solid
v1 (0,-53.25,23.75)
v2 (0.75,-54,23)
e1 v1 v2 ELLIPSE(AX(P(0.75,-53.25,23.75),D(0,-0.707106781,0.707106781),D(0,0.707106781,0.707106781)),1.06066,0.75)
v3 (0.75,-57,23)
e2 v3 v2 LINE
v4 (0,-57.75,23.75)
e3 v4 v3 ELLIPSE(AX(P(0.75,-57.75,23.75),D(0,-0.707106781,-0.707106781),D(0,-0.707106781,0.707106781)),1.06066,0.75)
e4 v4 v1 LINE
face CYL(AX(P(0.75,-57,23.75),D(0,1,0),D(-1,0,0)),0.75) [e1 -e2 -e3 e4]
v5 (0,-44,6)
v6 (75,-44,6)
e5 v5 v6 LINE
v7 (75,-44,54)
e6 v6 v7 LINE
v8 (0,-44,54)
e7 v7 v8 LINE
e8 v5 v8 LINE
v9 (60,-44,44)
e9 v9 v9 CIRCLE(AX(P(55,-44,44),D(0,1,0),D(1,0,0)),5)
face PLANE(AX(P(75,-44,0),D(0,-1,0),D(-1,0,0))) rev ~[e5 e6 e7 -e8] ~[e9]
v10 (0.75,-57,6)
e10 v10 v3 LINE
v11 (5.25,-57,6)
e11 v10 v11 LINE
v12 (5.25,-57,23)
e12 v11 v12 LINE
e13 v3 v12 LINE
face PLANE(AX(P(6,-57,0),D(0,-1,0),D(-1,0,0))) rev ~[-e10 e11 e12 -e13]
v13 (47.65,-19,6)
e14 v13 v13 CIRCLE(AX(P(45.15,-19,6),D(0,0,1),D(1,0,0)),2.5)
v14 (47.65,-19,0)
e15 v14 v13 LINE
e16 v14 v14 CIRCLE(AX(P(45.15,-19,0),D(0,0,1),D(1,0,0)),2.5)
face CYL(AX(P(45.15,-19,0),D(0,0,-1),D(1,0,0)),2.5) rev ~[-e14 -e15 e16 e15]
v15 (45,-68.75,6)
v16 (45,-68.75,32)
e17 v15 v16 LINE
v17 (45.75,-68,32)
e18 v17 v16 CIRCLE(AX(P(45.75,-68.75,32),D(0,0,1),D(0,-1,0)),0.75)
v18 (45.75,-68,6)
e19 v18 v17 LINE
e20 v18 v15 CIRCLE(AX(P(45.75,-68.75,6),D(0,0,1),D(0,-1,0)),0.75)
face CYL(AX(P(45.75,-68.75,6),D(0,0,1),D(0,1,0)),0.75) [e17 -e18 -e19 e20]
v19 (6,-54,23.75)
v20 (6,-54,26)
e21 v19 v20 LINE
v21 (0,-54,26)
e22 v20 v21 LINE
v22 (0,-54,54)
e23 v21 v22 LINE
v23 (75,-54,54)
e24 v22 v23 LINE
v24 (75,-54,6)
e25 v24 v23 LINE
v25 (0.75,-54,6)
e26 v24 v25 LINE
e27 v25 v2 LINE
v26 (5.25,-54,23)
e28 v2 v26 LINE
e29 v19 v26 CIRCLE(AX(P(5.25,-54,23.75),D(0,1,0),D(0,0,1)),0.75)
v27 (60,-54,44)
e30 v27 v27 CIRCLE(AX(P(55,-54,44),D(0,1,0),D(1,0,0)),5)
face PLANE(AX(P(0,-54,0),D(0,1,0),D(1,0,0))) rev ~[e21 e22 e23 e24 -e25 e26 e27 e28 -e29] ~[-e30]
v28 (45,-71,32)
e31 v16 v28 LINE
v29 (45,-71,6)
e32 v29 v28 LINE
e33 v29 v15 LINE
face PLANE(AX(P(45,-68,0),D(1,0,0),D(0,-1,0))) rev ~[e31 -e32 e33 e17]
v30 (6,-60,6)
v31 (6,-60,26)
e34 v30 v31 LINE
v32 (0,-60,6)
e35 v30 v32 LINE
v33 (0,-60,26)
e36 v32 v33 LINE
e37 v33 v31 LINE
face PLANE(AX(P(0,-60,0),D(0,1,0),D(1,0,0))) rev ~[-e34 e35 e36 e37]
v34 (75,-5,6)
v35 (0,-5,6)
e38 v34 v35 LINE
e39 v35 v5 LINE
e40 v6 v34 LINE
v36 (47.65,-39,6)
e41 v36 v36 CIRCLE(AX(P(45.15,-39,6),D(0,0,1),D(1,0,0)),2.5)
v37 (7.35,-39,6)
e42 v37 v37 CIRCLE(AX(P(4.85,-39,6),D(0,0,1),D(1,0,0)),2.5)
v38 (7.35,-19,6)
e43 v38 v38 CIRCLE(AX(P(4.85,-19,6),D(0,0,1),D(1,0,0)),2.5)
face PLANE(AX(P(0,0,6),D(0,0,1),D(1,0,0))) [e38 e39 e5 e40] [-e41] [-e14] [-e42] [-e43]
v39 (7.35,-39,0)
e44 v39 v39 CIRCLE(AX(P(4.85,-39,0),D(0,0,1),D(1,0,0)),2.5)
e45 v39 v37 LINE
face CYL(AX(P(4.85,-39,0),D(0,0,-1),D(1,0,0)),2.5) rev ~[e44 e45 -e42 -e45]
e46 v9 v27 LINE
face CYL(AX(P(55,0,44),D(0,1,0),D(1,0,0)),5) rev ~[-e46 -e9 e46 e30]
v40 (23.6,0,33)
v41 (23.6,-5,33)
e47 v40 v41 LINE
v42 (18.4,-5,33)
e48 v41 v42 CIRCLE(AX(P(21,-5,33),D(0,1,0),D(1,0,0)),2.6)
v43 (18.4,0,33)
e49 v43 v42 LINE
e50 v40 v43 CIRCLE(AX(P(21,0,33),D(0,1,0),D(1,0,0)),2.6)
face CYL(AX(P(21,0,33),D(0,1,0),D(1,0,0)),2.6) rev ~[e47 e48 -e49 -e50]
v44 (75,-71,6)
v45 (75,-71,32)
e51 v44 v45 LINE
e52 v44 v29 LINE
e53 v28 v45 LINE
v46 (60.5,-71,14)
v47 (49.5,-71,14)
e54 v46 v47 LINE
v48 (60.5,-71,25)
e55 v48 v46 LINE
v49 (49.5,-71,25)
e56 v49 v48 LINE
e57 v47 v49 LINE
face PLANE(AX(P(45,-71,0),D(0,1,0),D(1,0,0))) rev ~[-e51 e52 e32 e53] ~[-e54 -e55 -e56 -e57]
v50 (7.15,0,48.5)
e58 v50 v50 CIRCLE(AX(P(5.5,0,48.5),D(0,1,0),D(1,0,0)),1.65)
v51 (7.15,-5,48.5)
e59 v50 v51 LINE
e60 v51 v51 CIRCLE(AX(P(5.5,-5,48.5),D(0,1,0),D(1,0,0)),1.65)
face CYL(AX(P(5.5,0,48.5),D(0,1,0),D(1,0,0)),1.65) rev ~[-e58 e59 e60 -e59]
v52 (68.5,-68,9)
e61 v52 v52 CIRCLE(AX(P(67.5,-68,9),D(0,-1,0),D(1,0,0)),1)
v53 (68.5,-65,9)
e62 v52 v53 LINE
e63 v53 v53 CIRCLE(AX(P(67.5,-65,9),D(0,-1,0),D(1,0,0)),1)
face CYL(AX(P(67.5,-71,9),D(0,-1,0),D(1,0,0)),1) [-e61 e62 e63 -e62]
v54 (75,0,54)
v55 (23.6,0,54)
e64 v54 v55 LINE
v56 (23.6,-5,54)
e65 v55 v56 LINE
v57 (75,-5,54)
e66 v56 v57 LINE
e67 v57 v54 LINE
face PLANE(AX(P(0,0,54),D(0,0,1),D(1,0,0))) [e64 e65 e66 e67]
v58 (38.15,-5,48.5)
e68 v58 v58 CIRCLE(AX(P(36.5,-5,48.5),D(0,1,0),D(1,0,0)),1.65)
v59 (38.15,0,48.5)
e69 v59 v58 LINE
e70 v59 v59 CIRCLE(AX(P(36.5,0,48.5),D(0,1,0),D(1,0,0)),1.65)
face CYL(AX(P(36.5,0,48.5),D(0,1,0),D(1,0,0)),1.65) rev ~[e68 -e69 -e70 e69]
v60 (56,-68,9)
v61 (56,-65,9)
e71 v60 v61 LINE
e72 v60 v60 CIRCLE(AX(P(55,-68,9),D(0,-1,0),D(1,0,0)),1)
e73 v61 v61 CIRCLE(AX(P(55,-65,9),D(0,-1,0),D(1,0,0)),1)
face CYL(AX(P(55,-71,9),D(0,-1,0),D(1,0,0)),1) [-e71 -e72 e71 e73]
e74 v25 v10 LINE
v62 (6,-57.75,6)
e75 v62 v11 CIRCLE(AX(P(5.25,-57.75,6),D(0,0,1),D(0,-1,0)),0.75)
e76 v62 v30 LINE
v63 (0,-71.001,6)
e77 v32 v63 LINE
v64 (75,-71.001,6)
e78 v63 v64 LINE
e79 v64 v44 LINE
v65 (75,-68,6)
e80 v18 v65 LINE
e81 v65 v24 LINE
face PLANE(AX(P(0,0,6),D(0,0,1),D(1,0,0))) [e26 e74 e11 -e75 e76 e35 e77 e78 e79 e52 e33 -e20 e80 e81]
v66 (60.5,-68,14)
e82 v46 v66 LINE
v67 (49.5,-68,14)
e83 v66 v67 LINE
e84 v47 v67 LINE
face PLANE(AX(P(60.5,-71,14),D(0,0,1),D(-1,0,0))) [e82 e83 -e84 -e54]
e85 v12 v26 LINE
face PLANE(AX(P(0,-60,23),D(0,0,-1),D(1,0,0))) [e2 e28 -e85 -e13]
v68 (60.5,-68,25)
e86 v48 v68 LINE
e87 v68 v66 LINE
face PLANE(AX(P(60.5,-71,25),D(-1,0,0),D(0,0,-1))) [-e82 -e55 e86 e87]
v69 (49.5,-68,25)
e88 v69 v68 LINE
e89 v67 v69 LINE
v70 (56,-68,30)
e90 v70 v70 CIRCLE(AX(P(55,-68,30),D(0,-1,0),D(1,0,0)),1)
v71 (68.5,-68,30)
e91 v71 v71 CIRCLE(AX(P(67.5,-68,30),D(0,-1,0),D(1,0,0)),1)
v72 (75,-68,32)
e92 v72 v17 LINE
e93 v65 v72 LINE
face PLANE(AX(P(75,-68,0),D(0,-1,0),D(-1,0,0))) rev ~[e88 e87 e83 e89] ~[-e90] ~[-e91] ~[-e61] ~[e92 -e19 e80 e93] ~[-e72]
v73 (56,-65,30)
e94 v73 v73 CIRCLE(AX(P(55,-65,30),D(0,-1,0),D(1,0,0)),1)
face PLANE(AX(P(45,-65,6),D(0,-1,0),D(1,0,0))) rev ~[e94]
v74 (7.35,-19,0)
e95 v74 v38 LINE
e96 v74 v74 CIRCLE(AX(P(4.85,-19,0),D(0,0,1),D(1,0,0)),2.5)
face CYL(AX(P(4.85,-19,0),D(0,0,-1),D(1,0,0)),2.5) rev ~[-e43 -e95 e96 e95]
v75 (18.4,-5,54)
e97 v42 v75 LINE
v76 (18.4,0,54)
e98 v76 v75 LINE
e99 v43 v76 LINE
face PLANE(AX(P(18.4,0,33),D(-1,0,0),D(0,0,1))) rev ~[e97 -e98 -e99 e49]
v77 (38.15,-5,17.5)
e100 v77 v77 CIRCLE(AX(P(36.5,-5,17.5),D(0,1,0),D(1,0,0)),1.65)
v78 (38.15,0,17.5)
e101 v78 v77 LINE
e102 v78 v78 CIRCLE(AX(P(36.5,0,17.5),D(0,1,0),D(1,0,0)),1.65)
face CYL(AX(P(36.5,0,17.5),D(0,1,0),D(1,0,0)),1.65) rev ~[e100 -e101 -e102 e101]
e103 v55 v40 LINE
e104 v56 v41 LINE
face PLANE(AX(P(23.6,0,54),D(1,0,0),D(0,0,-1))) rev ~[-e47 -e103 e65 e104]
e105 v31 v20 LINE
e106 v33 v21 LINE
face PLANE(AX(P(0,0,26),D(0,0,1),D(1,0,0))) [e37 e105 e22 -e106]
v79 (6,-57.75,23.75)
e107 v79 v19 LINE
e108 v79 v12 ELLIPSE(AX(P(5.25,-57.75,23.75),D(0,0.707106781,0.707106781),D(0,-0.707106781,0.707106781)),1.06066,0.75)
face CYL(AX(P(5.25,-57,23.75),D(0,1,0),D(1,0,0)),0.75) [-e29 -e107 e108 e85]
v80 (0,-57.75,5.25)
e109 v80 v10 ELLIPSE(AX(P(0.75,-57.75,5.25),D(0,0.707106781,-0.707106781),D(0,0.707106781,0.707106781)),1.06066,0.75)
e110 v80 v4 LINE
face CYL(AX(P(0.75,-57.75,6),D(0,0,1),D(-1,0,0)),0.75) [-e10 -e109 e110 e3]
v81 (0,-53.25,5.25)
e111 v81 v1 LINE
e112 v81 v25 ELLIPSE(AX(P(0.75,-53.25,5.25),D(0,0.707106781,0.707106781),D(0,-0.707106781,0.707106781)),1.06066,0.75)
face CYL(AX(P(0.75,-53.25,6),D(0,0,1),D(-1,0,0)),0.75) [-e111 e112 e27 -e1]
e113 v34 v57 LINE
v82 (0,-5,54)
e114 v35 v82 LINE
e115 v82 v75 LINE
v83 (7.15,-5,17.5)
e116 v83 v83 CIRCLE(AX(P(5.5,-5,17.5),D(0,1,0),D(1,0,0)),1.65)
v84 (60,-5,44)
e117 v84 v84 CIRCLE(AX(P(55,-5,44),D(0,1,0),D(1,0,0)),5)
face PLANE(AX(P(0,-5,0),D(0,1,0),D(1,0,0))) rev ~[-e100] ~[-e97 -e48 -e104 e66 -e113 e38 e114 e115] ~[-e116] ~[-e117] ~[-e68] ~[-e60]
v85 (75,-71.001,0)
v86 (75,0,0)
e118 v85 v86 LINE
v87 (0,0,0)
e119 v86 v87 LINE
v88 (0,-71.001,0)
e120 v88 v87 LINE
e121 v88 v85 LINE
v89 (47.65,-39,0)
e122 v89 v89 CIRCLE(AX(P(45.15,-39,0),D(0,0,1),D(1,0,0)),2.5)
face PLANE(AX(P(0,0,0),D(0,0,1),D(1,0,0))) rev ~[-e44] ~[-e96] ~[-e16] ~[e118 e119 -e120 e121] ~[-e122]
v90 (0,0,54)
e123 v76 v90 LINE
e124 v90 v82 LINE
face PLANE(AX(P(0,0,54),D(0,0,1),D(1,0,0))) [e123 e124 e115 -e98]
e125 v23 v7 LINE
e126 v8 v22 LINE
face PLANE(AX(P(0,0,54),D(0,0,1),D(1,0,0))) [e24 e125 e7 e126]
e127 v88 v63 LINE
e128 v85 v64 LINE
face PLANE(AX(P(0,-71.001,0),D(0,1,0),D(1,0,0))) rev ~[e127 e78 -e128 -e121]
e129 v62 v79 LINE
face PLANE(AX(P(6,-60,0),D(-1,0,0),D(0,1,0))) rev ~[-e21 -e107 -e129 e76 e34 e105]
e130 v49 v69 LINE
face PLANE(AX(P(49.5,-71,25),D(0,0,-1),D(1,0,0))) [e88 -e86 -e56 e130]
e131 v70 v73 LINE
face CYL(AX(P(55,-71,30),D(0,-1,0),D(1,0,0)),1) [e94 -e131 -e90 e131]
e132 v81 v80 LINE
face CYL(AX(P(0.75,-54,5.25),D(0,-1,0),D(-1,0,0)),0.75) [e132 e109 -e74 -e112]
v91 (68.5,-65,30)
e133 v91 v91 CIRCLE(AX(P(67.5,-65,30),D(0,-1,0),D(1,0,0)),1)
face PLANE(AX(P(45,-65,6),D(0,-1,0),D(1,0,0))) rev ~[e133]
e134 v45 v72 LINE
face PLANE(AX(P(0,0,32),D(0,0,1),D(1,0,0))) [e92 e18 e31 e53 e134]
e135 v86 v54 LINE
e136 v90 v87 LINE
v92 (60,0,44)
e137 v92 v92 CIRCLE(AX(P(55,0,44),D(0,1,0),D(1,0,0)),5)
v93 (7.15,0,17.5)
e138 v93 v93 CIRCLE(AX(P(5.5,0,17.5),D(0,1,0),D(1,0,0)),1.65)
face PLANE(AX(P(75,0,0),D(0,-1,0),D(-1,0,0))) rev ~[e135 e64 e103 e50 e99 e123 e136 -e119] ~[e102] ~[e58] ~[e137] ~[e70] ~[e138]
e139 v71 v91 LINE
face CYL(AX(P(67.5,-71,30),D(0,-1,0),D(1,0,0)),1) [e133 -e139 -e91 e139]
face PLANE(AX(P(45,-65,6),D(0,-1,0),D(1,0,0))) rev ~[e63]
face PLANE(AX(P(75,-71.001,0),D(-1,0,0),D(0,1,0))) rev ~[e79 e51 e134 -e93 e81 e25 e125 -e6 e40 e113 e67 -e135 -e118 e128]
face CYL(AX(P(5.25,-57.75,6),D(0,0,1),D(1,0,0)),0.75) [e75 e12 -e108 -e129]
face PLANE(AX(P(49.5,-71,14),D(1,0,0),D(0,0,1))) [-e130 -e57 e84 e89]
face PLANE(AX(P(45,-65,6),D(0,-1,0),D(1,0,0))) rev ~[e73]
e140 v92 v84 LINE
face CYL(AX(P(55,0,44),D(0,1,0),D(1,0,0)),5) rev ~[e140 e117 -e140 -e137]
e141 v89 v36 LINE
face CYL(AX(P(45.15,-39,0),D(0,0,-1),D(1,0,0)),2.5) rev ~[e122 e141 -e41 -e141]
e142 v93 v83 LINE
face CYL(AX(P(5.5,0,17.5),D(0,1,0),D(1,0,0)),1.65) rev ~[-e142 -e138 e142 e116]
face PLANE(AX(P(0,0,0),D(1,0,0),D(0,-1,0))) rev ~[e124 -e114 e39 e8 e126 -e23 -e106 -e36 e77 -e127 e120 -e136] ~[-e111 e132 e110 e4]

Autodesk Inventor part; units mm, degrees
ref_plane "YZ Plane" through (0, 0, 0) normal (1, 0, 0) x (0, 1, 0)
ref_plane "XZ Plane" through (0, 0, 0) normal (0, 1, 0) x (-1, 0, 0)
ref_plane "XY Plane" through (0, 0, 0) normal (0, 0, 1) x (1, 0, 0)
sketch "Sketch1" plane through (0, 0, 0) normal (0, 0, 1) x (1, 0, 0)
  line L0 (0, 0) -> (75, 0)
  line L1 (75, 0) -> (75, -71.001)
  line L2 (75, -71.001) -> (0, -71.001)
  line L3 (0, -71.001) -> (0, 0)
  circle A0 centre (15, -29) radius 2.5
  circle A1 centre (25, -29) radius 2.5
  circle A2 centre (35, -29) radius 2.5
  circle A3 centre (25, -19) radius 2.5
  circle A4 centre (25, -39) radius 2.5
  circle A5 centre (4.85, -29) radius 2.5
  circle A6 centre (4.85, -39) radius 2.5
  circle A7 centre (4.85, -19) radius 2.5
  circle A8 centre (45.15, -19) radius 2.5
  circle A9 centre (45.15, -39) radius 2.5
  line L4 (0, 0) -> (50, 0)
  line L5 (50, 0) -> (50, -5)
  line L6 (0, -5) -> (0, 0)
  line L7 (0, -5) -> (75, -5)
  line L8 (0, -44) -> (75, -44)
  line L9 (0, -54) -> (75, -54)
  line L10 (0, -68) -> (75, -68)
  line L11 (0, -71) -> (75, -71)
  line L12 (45, -68) -> (45, -71)
  line L13 (6, -54) -> (6, -68)
  line L14 (0, -57) -> (6, -57)
  line L15 (0, -60) -> (6, -60)
  point P0 (37.5, 0)
  dimension "d0" = 75
  dimension "d1" = 71.001
  dimension "d3" = 5
  dimension "d4" = 10
  dimension "d6" = 10
  dimension "d8" = 10
  dimension "d10" = 10
  dimension "d12" = 20.15
  dimension "d15" = 20.15
  dimension "d23" = 5
  dimension "d29" = 39
  dimension "d30" = 15
  dimension "d31" = 10
  dimension "d44" = 14
  dimension "d45" = 3
  dimension "d46" = 25
  dimension "d52" = 30
  dimension "d69" = 6
  dimension "d71" = 3
  dimension "d72" = 3
sketch "Sketch1 outline for Extrusion1" plane through (0, 0, 0) normal (0, 0, 1) x (1, 0, 0)
  line L0 (75, 0) -> (0, 0)
  line L1 (0, 0) -> (0, -71.001)
  line L2 (0, -71.001) -> (75, -71.001)
  line L3 (75, -71.001) -> (75, 0)
  circle A0 centre (45.15, -19) radius 2.5
  circle A1 centre (4.85, -39) radius 2.5
  circle A2 centre (45.15, -39) radius 2.5
  circle A3 centre (4.85, -19) radius 2.5
extrude "Extrusion1" add sketch "Sketch1 outline for Extrusion1" along normal blind 6
sketch "Sketch1 outline for Extrusion3" plane through (0, 0, 0) normal (0, 0, 1) x (1, 0, 0)
  line L0 (75, 0) -> (0, 0)
  line L1 (75, -5) -> (75, 0)
  line L2 (0, -5) -> (75, -5)
  line L3 (0, 0) -> (0, -5)
  line L4 (75, -44) -> (0, -44)
  line L5 (75, -54) -> (75, -44)
  line L6 (0, -54) -> (75, -54)
  line L7 (0, -44) -> (0, -54)
extrude "Extrusion3" add sketch "Sketch1 outline for Extrusion3" along normal blind 54
sketch "Sketch3" plane through (0, 0, 0) normal (0, 1, 0) x (1, 0, 0)
  line L0 (0, -54) -> (75, -54) projected
  line L1 (0, 0) -> (75, 0)
  line L2 (75, 0) -> (75, -54)
  line L3 (75, -54) -> (0, -54)
  line L4 (0, -54) -> (0, 0)
  circle A0 centre (5.5, -48.5) radius 1.65
  circle A1 centre (36.5, -48.5) radius 1.65
  circle A2 centre (5.5, -17.5) radius 1.65
  circle A3 centre (36.5, -17.5) radius 1.65
  line L5 (21, -33) -> (21, -54) construction
  line L6 (18.4, -33) -> (18.4, -54)
  line L7 (23.6, -54) -> (23.6, -33)
  arc A4 (23.6, -33) -> (18.4, -33) centre (21, -33) ccw
  arc A5 (18.4, -54) -> (23.6, -54) centre (21, -54) ccw
  circle A6 centre (55, -44) radius 5
  point P0 (21, -43.5)
  dimension "d34" = 3.3
  dimension "d35" = 31
  dimension "d36" = 31
  dimension "d37" = 5.2
  dimension "d38" = 15.5
  dimension "d39" = 15.5
  dimension "d40" = 21
  dimension "d41" = 21
  dimension "d47" = 10
  dimension "d48" = 10
  dimension "d49" = 20
sketch "Sketch3 outline for Extrusion5" plane through (0, 0, 0) normal (0, 1, 0) x (1, 0, 0)
  arc A0 (23.6, -33) -> (18.4, -33) centre (21, -33) ccw
  line L0 (23.6, -54) -> (23.6, -33)
  arc A1 (18.4, -54) -> (23.6, -54) centre (21, -54) ccw
  line L1 (18.4, -33) -> (18.4, -54)
  circle A2 centre (5.5, -48.5) radius 1.65
  circle A3 centre (36.5, -48.5) radius 1.65
  circle A4 centre (5.5, -17.5) radius 1.65
  circle A5 centre (36.5, -17.5) radius 1.65
extrude "Extrusion5" cut sketch "Sketch3 outline for Extrusion5" against normal blind 5
sketch "Sketch3 outline for Extrusion6" plane through (0, 0, 0) normal (0, 1, 0) x (1, 0, 0)
  circle A0 centre (55, -44) radius 5
extrude "Extrusion6" cut sketch "Sketch3 outline for Extrusion6" against normal blind 54
sketch "Sketch1 outline for Extrusion7" plane through (0, 0, 0) normal (0, 0, 1) x (1, 0, 0)
  line L0 (75, -71) -> (75, -68)
  line L1 (45, -71) -> (75, -71)
  line L2 (45, -68) -> (45, -71)
  line L3 (75, -68) -> (45, -68)
extrude "Extrusion7" add sketch "Sketch1 outline for Extrusion7" along normal blind 32
sketch "Sketch4" plane through (45, -71, 6) normal (0, -1, 0) x (1, 0, 0)
  line L0 (0, 0) -> (30, 0) projected
  line L1 (0, 26) -> (30, 26) projected
  line L2 (0, 0) -> (30, 0)
  line L3 (30, 0) -> (30, 26)
  line L4 (30, 26) -> (0, 26)
  line L5 (0, 26) -> (0, 0)
  circle A0 centre (22.5, 24) radius 1
  circle A1 centre (22.5, 3) radius 1
  circle A2 centre (10, 3) radius 1
  circle A3 centre (10, 24) radius 1
  line L6 (0, 0) -> (0, 26) projected
  line L7 (15.5, 8) -> (4.5, 8)
  line L8 (4.5, 8) -> (4.5, 19)
  line L9 (4.5, 19) -> (15.5, 19)
  line L10 (15.5, 19) -> (15.5, 8)
  line L11 (15.5, 8) -> (4.5, 19) construction
  line L12 (4.5, 8) -> (15.5, 19) construction
  point P0 (-45, -6)
  point P1 (10, 13.5)
  point P2 (10, 13.5)
  point P3 (10, 13.5)
  dimension "d55" = 2
  dimension "d58" = 12.5
  dimension "d59" = 21
  dimension "d60" = 2
  dimension "d61" = 11
  dimension "d62" = 11
  dimension "d63" = 10.5
  dimension "d68" = 20
sketch "Sketch4 outline for Extrusion8" plane through (45, -71, 6) normal (0, -1, 0) x (1, 0, 0)
  line L0 (15.5, 8) -> (4.5, 8)
  line L1 (4.5, 8) -> (4.5, 19)
  line L2 (4.5, 19) -> (15.5, 19)
  line L3 (15.5, 19) -> (15.5, 8)
extrude "Extrusion8" cut sketch "Sketch4 outline for Extrusion8" against normal blind 3
sketch "Sketch4 outline for Extrusion9" plane through (45, -71, 6) normal (0, -1, 0) x (1, 0, 0)
  circle A0 centre (22.5, 24) radius 1
  circle A1 centre (22.5, 3) radius 1
  circle A2 centre (10, 3) radius 1
  circle A3 centre (10, 24) radius 1
extrude "Extrusion9" add sketch "Sketch4 outline for Extrusion9" against normal blind 6
sketch "Sketch1 outline for Extrusion10" plane through (0, 0, 0) normal (0, 0, 1) x (1, 0, 0)
  line L0 (6, -57) -> (0, -57)
  line L1 (6, -60) -> (6, -57)
  line L2 (0, -60) -> (6, -60)
  line L3 (0, -57) -> (0, -60)
extrude "Extrusion10" add sketch "Sketch1 outline for Extrusion10" along normal blind 26
sketch "Sketch5" plane through (0, -60, 6) normal (0, -1, 0) x (1, 0, 0)
  line L0 (6, 20) -> (0, 20)
  line L1 (0, -1.548307) -> (6, -1.548307)
  line L2 (6, -1.548307) -> (6, 20)
  line L3 (6, 20) -> (0, 20)
  line L4 (0, 20) -> (0, -1.548307)
  line L5 (0, 17) -> (6, 17)
  point P0 (0, -6)
  dimension "d75" = 3
sketch "Sketch5 outline for Extrusion11" plane through (0, -60, 6) normal (0, -1, 0) x (1, 0, 0)
  line L0 (6, 17) -> (6, 20)
  line L1 (0, 17) -> (6, 17)
  line L2 (0, 20) -> (0, 17)
  line L3 (6, 20) -> (0, 20)
extrude "Extrusion11" add sketch "Sketch5 outline for Extrusion11" against normal blind 6
fillet "Fillet1" radius 0.75 7 edges at (6, -57, 14.5) (0, -57, 14.5) (0, -54, 14.5) (0, -55.5, 23) (0, -55.5, 6) (6, -55.5, 23) (45, -68, 19)
properties part number "pnp-head"
